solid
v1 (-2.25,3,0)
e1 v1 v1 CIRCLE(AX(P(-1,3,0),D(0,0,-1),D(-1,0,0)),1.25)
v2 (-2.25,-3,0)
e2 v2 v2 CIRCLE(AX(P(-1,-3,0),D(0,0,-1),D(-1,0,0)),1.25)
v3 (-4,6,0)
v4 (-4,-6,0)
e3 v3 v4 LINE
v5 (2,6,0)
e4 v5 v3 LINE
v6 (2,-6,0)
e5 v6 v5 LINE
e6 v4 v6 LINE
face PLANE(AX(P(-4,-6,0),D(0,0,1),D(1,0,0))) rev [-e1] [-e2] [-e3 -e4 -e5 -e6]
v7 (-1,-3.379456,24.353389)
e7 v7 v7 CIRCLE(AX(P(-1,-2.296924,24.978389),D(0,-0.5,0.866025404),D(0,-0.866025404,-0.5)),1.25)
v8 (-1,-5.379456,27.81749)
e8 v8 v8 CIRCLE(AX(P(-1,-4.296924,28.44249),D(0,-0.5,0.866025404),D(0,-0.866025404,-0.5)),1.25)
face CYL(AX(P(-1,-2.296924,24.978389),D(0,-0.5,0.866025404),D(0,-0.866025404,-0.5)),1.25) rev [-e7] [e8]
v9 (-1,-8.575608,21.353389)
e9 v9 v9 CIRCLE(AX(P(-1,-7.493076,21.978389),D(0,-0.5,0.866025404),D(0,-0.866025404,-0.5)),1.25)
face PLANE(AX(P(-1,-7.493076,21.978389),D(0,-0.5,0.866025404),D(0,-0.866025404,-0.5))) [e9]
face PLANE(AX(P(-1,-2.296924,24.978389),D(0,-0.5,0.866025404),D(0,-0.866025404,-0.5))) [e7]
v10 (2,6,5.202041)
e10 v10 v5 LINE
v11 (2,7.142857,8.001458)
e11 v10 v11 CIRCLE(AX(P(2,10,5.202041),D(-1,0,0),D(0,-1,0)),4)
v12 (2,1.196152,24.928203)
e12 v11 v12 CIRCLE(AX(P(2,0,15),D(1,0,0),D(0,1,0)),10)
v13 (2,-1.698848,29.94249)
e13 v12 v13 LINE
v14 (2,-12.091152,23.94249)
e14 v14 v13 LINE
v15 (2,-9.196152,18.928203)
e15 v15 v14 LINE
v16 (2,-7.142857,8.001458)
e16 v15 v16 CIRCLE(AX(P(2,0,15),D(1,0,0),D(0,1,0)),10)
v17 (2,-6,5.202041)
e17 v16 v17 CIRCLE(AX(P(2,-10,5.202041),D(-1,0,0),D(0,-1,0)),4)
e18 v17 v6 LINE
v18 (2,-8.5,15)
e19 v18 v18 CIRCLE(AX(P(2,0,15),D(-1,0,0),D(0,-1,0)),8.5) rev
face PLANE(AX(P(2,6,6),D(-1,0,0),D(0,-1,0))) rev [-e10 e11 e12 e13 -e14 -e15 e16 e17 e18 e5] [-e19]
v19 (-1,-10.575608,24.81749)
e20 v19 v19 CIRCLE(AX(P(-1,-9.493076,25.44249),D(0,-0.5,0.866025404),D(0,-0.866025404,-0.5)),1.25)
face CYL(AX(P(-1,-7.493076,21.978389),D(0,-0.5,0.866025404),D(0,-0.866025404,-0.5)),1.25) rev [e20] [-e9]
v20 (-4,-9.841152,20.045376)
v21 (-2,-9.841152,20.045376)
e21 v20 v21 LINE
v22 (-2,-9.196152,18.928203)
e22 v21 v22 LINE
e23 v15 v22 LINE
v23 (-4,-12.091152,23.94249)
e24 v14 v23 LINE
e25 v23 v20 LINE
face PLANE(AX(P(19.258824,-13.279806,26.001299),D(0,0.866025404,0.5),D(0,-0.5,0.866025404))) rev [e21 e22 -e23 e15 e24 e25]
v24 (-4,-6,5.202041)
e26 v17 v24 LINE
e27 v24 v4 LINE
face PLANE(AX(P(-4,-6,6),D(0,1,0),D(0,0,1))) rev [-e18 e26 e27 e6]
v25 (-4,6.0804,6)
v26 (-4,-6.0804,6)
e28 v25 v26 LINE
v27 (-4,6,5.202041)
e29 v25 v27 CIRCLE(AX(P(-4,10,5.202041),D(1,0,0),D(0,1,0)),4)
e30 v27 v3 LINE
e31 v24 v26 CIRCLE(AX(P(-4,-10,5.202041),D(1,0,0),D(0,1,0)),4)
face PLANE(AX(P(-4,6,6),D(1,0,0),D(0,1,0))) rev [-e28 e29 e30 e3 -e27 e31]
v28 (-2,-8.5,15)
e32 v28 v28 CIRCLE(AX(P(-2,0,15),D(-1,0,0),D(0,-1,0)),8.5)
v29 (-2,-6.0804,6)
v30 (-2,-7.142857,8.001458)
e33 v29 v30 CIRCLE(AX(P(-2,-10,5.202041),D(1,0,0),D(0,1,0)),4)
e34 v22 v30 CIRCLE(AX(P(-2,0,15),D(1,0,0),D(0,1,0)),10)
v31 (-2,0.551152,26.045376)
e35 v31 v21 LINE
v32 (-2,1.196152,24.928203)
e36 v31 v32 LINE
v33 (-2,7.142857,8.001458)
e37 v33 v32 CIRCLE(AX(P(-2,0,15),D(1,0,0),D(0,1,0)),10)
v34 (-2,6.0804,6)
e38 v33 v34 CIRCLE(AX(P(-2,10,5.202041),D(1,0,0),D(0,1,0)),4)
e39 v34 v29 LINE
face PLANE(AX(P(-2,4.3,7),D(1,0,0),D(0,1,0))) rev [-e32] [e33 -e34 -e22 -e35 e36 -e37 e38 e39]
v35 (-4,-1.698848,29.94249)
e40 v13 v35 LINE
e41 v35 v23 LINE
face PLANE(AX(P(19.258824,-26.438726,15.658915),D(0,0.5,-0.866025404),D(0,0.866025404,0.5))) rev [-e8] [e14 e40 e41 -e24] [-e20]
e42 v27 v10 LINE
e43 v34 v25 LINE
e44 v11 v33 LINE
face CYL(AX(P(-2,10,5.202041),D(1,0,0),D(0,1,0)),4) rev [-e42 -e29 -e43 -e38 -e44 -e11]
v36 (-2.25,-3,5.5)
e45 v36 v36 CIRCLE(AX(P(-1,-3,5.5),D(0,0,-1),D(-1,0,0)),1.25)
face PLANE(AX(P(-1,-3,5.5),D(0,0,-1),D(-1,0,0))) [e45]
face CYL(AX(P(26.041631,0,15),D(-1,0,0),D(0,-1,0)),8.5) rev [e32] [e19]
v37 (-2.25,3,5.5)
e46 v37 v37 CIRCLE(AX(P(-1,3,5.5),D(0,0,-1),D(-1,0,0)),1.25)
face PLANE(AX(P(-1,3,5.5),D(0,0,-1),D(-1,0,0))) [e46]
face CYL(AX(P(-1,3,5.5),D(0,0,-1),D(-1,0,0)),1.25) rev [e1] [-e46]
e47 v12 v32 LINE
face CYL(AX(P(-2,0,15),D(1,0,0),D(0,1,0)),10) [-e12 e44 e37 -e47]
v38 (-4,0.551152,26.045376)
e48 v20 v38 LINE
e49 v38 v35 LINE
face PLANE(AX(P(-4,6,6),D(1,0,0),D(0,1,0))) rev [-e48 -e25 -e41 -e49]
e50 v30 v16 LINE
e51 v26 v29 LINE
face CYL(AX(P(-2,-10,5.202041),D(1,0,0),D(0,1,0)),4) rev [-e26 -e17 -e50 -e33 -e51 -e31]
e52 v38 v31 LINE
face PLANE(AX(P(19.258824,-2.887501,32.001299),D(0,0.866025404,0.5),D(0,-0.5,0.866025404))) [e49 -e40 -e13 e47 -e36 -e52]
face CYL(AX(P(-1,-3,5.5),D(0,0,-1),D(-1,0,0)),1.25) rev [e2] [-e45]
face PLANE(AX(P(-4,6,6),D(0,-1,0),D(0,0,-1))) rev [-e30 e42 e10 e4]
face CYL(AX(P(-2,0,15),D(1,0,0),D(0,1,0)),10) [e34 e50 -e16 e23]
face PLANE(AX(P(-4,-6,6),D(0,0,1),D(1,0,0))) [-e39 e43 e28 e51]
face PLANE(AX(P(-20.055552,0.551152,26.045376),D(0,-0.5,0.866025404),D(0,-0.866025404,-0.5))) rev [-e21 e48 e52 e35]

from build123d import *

# Parameters (mm, degrees)
SKETCH1_W       = 6
SKETCH1_H       = 12
EXTRUDE1_DEPTH  = 6
SKETCH3_W       = 4
SKETCH3_H       = 8.6
EXTRUDE2_DEPTH  = 1
SKETCH2_R       = 1.25
EXTRUDE3_DEPTH  = 5.5
EXTRUDE4_DEPTH  = 4
SKETCH6_R       = 8.5
EXTRUDE5_DEPTH  = 4
FILLET1_R       = 4
EXTRUDE9_START  = -4
EXTRUDE9_DEPTH  = 4
EXTRUDE10_DEPTH = 2
SKETCH14_R      = 1.25
EXTRUDE11_DEPTH = 4


with BuildPart() as part:
    # Sketch1 → Extrude1 (new body)
    with BuildSketch(Plane.XY):
        with Locations((-1, 0)):
            Rectangle(SKETCH1_W, SKETCH1_H)
    extrude(amount=EXTRUDE1_DEPTH)

    # Sketch3 → Extrude2 (add)
    with BuildSketch(Plane.XY.offset(6)):
        Rectangle(SKETCH3_W, SKETCH3_H)
    extrude(amount=EXTRUDE2_DEPTH)

    # Sketch2 → Extrude3 (cut)
    with BuildSketch(Plane(origin=(0, 0, 0), x_dir=(-1, 0, 0), z_dir=(0, 0, -1))):
        with Locations((1, 3)):
            Circle(SKETCH2_R)
        with Locations((1, -3)):
            Circle(SKETCH2_R)
    extrude(amount=-EXTRUDE3_DEPTH, mode=Mode.SUBTRACT)

    # Sketch4 → Extrude4 (add)
    with BuildSketch(Plane(origin=(2, 0, 0), x_dir=(0, 0, -1), z_dir=(1, 0, 0))):
        with BuildLine():
            Line((-7, 6), (-6, 6))
            Line((-6, 6), (-6, -6))
            Line((-6, -6), (-7, -6))
            ThreePointArc((-7, -6), (-25, 0), (-7, 6))
        make_face()
    extrude(amount=-EXTRUDE4_DEPTH)

    # Sketch6 → Extrude5 (cut)
    with BuildSketch(Plane.ZY.offset(2)):
        with Locations(Location((15, 0, 0), (0, 0, 270))):
            Circle(SKETCH6_R)
    extrude(amount=-EXTRUDE5_DEPTH, mode=Mode.SUBTRACT)

    # Fillet1
    # the kernel refuses this fillet: 4 mm, written as the material it adds along each edge
    with BuildSketch(Plane(origin=(2, 6, 7), x_dir=(0, 0, -1), z_dir=(-1, 0, 0))) as fillet1_piece_1_section:
        with BuildLine():
            CenterArc((1.797958971, -4), FILLET1_R, 90, 44.415308597)
            ThreePointArc((-1.001457878, -1.142857143), (-0.478989625, -0.590478203), (0, 0))
            Line((0, 0), (1.797958971, 0))
        make_face()
    fillet1_piece_1 = extrude(amount=4, mode=Mode.PRIVATE)
    fillet1_piece_1 = split(fillet1_piece_1, bisect_by=Plane(origin=(0, 5.976030652, 6), z_dir=(0, 0, -1)), keep=Keep.TOP, mode=Mode.PRIVATE)
    add(fillet1_piece_1)
    with BuildSketch(Plane(origin=(2, 6, 7), x_dir=(0, 0, -1), z_dir=(-1, 0, 0))) as fillet1_piece_2_section:
        with BuildLine():
            CenterArc((1.797958971, -4), FILLET1_R, 90, 44.415308597)
            ThreePointArc((-1.001457878, -1.142857143), (-0.478989625, -0.590478203), (0, 0))
            Line((0, 0), (1.797958971, 0))
        make_face()
    fillet1_piece_2 = extrude(amount=4, mode=Mode.PRIVATE)
    fillet1_piece_2 = split(fillet1_piece_2, bisect_by=Plane(origin=(0, 6.277319808, 6), z_dir=(0, 0, 1)), keep=Keep.TOP, mode=Mode.PRIVATE)
    add(fillet1_piece_2)
    with BuildSketch(Plane(origin=(2, 6, 7), x_dir=(0, 0, -1), z_dir=(-1, 0, 0))) as fillet1_piece_3_section:
        with BuildLine():
            CenterArc((1.797958971, -4), FILLET1_R, 90, 44.415308597)
            ThreePointArc((-1.001457878, -1.142857143), (-0.478989625, -0.590478203), (0, 0))
            Line((0, 0), (1.797958971, 0))
        make_face()
    fillet1_piece_3 = extrude(amount=8.494897428, mode=Mode.PRIVATE)
    fillet1_piece_3 = split(fillet1_piece_3, bisect_by=Plane(origin=(-4, 5.976030652, 5.651028554), z_dir=(1, 0, 0)), keep=Keep.TOP, mode=Mode.PRIVATE)
    fillet1_piece_3 = split(fillet1_piece_3, bisect_by=Plane(origin=(-3, 5.976030652, 6), z_dir=(0, 0, -1)), keep=Keep.TOP, mode=Mode.PRIVATE)
    fillet1_piece_3 = split(fillet1_piece_3, bisect_by=Plane(origin=(-2, 5.976030652, 5.651028554), z_dir=(-1, 0, 0)), keep=Keep.TOP, mode=Mode.PRIVATE)
    add(fillet1_piece_3)
    with BuildSketch(Plane(origin=(2, -6, 7), x_dir=(0, -0.7521010374968901, 0.6590478202650409), z_dir=(-1, 0, 0))) as fillet1_piece_4_section:
        with BuildLine():
            CenterArc((1.823463209, -3.988438089), FILLET1_R, 94.357396878, 44.415308597)
            Line((-1.184940941, -1.352246808), (0, 0))
            ThreePointArc((0, 0), (0.759776337, -0.028904778), (1.519552674, 0))
        make_face()
    fillet1_piece_4 = extrude(amount=4, mode=Mode.PRIVATE)
    fillet1_piece_4 = split(fillet1_piece_4, bisect_by=Plane(origin=(0, -6.277319808, 6), z_dir=(0, 0, 1)), keep=Keep.TOP, mode=Mode.PRIVATE)
    add(fillet1_piece_4)
    with BuildSketch(Plane(origin=(2, -6, 7), x_dir=(0, -0.7521010374968901, 0.6590478202650409), z_dir=(-1, 0, 0))) as fillet1_piece_5_section:
        with BuildLine():
            CenterArc((1.823463209, -3.988438089), FILLET1_R, 94.357396878, 44.415308597)
            Line((-1.184940941, -1.352246808), (0, 0))
            ThreePointArc((0, 0), (0.759776337, -0.028904778), (1.519552674, 0))
        make_face()
    fillet1_piece_5 = extrude(amount=4, mode=Mode.PRIVATE)
    fillet1_piece_5 = split(fillet1_piece_5, bisect_by=Plane(origin=(0, -5.976030652, 6), z_dir=(0, 0, -1)), keep=Keep.TOP, mode=Mode.PRIVATE)
    add(fillet1_piece_5)
    with BuildSketch(Plane(origin=(2, -6, 7), x_dir=(0, -0.7521010374968901, 0.6590478202650409), z_dir=(-1, 0, 0))) as fillet1_piece_6_section:
        with BuildLine():
            CenterArc((1.823463209, -3.988438089), FILLET1_R, 94.357396878, 44.415308597)
            Line((-1.184940941, -1.352246808), (0, 0))
            ThreePointArc((0, 0), (0.759776337, -0.028904778), (1.519552674, 0))
        make_face()
    fillet1_piece_6 = extrude(amount=8.494897428, mode=Mode.PRIVATE)
    fillet1_piece_6 = split(fillet1_piece_6, bisect_by=Plane(origin=(-4, -5.976030652, 5.651028554), z_dir=(1, 0, 0)), keep=Keep.TOP, mode=Mode.PRIVATE)
    fillet1_piece_6 = split(fillet1_piece_6, bisect_by=Plane(origin=(-3, -5.976030652, 6), z_dir=(0, 0, -1)), keep=Keep.TOP, mode=Mode.PRIVATE)
    fillet1_piece_6 = split(fillet1_piece_6, bisect_by=Plane(origin=(-2, -5.976030652, 5.651028554), z_dir=(-1, 0, 0)), keep=Keep.TOP, mode=Mode.PRIVATE)
    add(fillet1_piece_6)

    # Sketch12 → Extrude9 (add)
    with BuildSketch(Plane.ZY.offset(2).offset(EXTRUDE9_START)):
        with BuildLine():
            Line((18.92820323, -9.196152423), (23.942490318, -12.091152423))
            Line((23.942490318, -12.091152423), (29.942490318, -1.698847577))
            Line((29.942490318, -1.698847577), (24.92820323, 1.196152423))
            ThreePointArc((24.92820323, 1.196152423), (23.660254038, -5), (18.92820323, -9.196152423))
        make_face()
    extrude(amount=EXTRUDE9_DEPTH)

    # Sketch13 → Extrude10 (add)
    with BuildSketch(Plane.ZY.offset(2)):
        Polygon((29.942490318, -1.698847577), (26.045376001, 0.551152423), (20.045376001, -9.841152423), (23.942490318, -12.091152423), align=None)
    extrude(amount=EXTRUDE10_DEPTH)

    # Sketch14 → Extrude11 (cut)
    with BuildSketch(Plane(origin=(0, -13.390190528, 23.192490318), x_dir=(1, 0, 0), z_dir=(0, -0.5000000000000007, 0.8660254037844383))):
        with Locations(Location((-1, 4.5, 0), (0, 0, 270))):
            Circle(SKETCH14_R)
        with Locations(Location((-1, 10.5, 0), (0, 0, 270))):
            Circle(SKETCH14_R)
    extrude(amount=-EXTRUDE11_DEPTH, mode=Mode.SUBTRACT)


solid = part.part
